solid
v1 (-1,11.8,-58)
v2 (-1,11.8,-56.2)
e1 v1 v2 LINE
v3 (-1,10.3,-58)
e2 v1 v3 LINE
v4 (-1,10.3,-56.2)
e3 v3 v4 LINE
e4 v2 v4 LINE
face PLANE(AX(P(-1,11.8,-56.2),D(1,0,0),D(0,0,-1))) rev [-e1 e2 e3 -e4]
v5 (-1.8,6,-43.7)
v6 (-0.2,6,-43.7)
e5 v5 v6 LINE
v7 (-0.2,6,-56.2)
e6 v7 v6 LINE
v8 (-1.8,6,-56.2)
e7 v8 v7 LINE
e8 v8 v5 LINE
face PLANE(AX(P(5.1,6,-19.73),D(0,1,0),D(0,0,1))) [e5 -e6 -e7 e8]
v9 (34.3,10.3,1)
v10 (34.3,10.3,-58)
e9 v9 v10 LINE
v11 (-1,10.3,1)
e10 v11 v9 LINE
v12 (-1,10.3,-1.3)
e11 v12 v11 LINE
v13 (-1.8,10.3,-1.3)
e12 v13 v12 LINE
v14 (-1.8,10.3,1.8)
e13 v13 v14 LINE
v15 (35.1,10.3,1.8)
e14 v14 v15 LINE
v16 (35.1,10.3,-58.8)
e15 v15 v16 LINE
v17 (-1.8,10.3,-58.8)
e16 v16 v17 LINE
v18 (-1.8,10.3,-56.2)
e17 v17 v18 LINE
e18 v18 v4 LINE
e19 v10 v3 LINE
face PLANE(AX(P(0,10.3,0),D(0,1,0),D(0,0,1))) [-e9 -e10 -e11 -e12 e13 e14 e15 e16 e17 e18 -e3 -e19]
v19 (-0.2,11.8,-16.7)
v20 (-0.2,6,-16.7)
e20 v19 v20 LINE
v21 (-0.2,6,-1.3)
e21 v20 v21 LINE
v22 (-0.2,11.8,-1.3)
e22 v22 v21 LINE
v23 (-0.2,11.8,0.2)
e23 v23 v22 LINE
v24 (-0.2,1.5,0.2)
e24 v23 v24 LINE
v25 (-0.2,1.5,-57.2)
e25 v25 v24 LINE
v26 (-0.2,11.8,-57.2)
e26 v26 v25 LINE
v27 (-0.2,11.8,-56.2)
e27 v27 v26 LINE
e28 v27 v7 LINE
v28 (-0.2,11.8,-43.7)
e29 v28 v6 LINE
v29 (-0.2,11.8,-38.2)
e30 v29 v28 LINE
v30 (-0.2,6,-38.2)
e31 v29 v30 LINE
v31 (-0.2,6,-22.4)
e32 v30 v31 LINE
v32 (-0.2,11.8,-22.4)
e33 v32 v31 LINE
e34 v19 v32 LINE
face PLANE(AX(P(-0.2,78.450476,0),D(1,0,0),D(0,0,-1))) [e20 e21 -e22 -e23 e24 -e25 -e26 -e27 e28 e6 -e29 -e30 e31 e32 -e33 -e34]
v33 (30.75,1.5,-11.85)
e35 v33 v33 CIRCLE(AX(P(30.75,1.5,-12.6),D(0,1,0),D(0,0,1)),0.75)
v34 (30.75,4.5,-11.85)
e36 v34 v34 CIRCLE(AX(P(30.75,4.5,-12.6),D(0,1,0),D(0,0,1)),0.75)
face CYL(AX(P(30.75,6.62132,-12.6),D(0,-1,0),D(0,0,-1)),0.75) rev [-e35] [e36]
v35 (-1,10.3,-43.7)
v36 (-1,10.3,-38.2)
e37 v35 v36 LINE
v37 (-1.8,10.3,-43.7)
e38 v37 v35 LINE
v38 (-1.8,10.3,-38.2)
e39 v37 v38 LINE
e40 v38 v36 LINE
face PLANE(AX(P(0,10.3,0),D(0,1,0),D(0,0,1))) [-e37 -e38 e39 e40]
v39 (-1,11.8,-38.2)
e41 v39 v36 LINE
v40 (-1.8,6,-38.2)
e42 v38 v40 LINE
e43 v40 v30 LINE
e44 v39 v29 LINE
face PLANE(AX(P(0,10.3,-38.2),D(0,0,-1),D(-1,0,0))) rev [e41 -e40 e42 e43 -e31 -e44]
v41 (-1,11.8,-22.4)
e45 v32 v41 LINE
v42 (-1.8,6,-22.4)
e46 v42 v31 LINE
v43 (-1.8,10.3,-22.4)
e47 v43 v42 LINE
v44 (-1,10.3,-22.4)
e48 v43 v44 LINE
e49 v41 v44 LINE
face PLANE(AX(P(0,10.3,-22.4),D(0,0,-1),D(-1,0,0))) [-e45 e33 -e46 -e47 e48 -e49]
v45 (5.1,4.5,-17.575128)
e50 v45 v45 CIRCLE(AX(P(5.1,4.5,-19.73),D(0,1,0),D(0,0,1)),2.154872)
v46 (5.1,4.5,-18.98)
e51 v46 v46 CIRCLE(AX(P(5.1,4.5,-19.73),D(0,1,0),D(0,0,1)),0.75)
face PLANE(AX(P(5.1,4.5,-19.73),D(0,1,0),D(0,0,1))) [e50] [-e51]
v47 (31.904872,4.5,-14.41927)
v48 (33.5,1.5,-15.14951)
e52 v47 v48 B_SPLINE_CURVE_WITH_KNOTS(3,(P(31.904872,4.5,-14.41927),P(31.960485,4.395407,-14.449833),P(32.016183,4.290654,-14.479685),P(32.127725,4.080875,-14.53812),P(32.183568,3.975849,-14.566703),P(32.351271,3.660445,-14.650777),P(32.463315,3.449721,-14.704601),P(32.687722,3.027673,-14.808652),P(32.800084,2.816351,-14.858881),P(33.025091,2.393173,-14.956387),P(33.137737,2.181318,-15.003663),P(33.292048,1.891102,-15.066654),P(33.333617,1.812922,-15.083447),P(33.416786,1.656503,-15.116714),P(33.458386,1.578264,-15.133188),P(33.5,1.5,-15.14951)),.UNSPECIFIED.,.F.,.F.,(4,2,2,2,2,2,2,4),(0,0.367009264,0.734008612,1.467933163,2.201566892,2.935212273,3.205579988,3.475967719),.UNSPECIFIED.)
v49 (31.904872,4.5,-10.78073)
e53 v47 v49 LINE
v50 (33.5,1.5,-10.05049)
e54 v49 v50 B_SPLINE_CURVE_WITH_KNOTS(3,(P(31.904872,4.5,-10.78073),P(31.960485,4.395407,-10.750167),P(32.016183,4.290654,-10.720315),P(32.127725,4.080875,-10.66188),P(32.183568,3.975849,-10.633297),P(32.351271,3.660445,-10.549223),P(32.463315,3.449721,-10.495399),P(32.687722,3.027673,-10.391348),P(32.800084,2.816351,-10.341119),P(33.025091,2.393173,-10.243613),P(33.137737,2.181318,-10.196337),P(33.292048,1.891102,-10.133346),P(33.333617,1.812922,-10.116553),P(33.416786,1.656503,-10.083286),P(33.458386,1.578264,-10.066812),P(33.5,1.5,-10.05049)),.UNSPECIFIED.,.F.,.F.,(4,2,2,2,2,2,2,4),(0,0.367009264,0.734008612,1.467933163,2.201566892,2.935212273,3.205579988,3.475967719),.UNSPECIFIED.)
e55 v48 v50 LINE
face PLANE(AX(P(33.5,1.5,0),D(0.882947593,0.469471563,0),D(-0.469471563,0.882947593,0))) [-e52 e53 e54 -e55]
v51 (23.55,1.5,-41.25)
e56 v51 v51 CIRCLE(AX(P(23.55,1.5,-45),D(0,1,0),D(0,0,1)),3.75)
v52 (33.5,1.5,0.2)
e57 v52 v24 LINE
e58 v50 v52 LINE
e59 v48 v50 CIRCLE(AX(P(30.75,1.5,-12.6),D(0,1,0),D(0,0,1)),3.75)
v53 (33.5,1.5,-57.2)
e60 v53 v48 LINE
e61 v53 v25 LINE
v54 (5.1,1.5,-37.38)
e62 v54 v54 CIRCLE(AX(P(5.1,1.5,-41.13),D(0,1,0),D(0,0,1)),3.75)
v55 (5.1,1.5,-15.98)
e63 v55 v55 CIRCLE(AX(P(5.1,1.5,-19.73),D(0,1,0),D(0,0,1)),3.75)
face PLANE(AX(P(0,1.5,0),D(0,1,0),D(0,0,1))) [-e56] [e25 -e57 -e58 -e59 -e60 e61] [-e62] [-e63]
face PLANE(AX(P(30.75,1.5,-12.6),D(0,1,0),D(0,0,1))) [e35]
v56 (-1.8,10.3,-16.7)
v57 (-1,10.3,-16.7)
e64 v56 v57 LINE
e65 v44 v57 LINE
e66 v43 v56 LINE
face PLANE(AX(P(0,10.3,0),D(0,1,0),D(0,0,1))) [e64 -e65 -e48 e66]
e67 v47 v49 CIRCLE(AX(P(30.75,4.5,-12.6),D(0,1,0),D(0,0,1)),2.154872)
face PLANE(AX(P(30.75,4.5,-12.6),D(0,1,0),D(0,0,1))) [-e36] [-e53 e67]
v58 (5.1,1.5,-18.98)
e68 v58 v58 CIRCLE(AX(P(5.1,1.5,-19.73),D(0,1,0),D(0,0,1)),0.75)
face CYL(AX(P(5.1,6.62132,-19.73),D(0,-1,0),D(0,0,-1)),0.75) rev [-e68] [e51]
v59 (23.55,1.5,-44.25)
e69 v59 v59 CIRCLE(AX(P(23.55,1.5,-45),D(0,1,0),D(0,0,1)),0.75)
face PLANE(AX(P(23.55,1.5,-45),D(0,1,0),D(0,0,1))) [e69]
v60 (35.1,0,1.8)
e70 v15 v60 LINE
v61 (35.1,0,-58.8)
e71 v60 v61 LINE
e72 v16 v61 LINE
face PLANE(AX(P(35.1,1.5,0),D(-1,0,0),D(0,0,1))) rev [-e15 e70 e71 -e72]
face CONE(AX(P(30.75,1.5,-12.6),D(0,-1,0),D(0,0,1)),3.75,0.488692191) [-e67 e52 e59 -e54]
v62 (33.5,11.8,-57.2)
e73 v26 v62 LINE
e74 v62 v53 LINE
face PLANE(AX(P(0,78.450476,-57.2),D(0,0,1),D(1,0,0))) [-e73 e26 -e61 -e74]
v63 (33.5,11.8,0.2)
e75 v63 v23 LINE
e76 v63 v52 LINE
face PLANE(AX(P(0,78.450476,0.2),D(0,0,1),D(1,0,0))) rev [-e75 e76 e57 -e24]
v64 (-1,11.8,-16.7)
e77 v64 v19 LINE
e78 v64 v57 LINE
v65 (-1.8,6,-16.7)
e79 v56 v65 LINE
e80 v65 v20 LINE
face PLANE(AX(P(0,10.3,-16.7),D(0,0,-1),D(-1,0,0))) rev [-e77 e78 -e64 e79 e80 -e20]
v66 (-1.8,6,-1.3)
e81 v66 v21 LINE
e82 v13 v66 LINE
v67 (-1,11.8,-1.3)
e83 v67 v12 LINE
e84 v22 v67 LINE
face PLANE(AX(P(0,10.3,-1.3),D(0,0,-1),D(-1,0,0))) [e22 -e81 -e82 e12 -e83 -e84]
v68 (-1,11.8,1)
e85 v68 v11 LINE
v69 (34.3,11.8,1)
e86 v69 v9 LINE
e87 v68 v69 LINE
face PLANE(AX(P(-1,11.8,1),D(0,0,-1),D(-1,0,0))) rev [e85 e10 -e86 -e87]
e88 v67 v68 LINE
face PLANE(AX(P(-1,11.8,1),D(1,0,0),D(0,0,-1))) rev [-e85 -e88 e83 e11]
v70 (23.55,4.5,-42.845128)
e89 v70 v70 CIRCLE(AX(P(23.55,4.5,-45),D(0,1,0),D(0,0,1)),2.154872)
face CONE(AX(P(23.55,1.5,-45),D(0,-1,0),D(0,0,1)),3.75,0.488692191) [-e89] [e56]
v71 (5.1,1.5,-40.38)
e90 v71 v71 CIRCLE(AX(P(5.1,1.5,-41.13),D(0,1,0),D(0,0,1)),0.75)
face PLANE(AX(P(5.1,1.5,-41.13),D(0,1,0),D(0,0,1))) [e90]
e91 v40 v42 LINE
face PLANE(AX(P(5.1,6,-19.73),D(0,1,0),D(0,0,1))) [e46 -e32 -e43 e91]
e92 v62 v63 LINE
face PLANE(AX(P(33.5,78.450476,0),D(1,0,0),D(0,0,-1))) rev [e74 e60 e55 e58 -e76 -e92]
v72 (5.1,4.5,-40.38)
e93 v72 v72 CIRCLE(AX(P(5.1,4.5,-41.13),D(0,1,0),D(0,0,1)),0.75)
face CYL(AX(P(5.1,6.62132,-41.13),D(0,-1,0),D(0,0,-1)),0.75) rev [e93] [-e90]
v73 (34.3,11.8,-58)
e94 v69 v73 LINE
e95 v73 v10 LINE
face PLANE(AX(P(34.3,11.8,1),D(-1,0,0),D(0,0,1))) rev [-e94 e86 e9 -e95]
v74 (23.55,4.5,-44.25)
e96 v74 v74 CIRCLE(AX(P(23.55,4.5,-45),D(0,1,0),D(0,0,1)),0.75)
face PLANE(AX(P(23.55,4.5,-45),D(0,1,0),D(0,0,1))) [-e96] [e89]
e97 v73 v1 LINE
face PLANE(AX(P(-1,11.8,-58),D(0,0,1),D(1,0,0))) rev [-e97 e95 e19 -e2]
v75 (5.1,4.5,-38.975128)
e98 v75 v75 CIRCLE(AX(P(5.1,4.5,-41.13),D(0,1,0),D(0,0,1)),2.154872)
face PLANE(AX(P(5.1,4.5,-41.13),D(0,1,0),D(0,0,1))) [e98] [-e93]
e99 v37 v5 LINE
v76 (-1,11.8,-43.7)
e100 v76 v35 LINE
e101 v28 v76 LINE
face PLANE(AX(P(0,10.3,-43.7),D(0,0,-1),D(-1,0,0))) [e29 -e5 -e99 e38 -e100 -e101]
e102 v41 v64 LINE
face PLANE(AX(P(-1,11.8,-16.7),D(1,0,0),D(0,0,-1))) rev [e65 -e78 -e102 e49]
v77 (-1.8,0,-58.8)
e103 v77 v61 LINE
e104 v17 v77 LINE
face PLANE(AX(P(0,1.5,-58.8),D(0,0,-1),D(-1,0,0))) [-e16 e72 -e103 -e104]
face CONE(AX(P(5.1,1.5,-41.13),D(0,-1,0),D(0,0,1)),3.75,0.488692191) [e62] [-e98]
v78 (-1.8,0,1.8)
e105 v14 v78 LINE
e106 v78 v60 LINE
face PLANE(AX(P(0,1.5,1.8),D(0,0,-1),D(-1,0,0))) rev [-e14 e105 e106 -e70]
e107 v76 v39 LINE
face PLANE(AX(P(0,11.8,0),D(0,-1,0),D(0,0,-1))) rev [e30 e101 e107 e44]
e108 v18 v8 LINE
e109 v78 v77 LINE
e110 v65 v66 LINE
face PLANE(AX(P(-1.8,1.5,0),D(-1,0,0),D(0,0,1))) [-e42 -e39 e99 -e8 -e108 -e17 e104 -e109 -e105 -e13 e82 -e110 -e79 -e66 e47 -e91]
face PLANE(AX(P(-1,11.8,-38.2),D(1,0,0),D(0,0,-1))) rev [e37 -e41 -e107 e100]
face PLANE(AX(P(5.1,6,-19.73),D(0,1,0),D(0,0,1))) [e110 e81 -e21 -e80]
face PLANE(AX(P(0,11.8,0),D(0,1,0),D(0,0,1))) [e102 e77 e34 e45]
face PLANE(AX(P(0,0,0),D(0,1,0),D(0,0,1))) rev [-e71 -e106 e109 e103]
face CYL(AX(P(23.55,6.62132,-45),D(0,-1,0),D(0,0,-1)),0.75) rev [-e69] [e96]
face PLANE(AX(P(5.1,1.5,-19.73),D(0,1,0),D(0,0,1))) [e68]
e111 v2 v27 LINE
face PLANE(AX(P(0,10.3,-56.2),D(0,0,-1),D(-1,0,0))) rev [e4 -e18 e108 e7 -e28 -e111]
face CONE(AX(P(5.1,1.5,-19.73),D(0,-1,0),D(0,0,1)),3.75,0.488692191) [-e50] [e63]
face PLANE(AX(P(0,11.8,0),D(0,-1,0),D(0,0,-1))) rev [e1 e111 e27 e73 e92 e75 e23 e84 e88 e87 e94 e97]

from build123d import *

# Parameters (mm, degrees)
SKETCH_2_W            = 36.9
SKETCH_2_H            = 60.6
SKETCH_2_W_2          = 33.7
SKETCH_2_H_2          = 57.4
SKETCH_2_R            = 3.75
SKETCH_2_R_2          = 2.25
SKETCH_2_R_3          = 0.75
EXTRUDE_1_DEPTH       = 1.5
EXTRUDE_2_OUTLINE_R   = 2.154871705
EXTRUDE_2_DEPTH       = 3
EXTRUDE_2_DRAFT       = 28
EXTRUDE_2_2_OUTLINE_R = 2.154871705
EXTRUDE_2_2_DEPTH     = 3
EXTRUDE_2_2_DRAFT     = 28
EXTRUDE_2_3_DEPTH     = 3
EXTRUDE_2_3_DRAFT     = 28
EXTRUDE_2_4_OUTLINE_R = 2.154871705
EXTRUDE_2_4_DEPTH     = 3
EXTRUDE_2_4_DRAFT     = 28
EXTRUDE_START         = 1.5
SKETCH_2_11_W         = 36.9
SKETCH_2_11_H         = 60.6
SKETCH_2_11_W_2       = 33.7
SKETCH_2_11_H_2       = 57.4
EXTRUDE_3_DEPTH       = 4.5
SKETCH_3_W            = 1.6
SKETCH_3_H            = 5.7
SKETCH_3_H_2          = 5.5
EXTRUDE_4_DEPTH       = 4.3
SKETCH_5_W            = 0.8
SKETCH_5_H            = 5.5
SKETCH_5_H_2          = 5.7
EXTRUDE_5_DEPTH       = 1.5
CUT_EXTRUDE_START     = 1.5
SKETCH_2_12_R         = 0.75
CUT_EXTRUDE_1_DEPTH   = 3


# Read off the part's stored shape, not the designer's step: Бобышка-Вытянуть2
with BuildPart() as part:
    # Эскиз2 → Бобышка-Вытянуть1 (new body)
    # profile 1 of 14: a face of its own
    with BuildSketch(Plane(origin=(0, 0, 0), x_dir=(1, 0, 0), z_dir=(0, 1, 0))):
        with Locations((16.65, 28.5)):
            Rectangle(SKETCH_2_W, SKETCH_2_H)
        with Locations((16.65, 28.5)):
            Rectangle(SKETCH_2_W_2, SKETCH_2_H_2, mode=Mode.SUBTRACT)
    # profile 2 of 14: a face of its own
    with BuildSketch(Plane(origin=(0, 0, 0), x_dir=(1, 0, 0), z_dir=(0, 1, 0))):
        with BuildLine():
            Line((-0.2, 57.2), (-0.2, -0.2))
            Line((-0.2, -0.2), (33.5, -0.2))
            Line((33.5, -0.2), (33.5, 10.050490243))
            ThreePointArc((33.5, 10.050490243), (27, 12.6), (33.5, 15.149509757))
            Line((33.5, 15.149509757), (33.5, 57.2))
            Line((33.5, 57.2), (-0.2, 57.2))
        make_face()
        with Locations((5.1, 19.73)):
            Circle(SKETCH_2_R, mode=Mode.SUBTRACT)
        with Locations((5.1, 41.13)):
            Circle(SKETCH_2_R, mode=Mode.SUBTRACT)
        with Locations((23.55, 45)):
            Circle(SKETCH_2_R, mode=Mode.SUBTRACT)
    # profile 3 of 14: a face of its own
    with BuildSketch(Plane(origin=(0, 0, 0), x_dir=(1, 0, 0), z_dir=(0, 1, 0))):
        with Locations((23.55, 45)):
            Circle(SKETCH_2_R)
        with Locations((23.55, 45)):
            Circle(SKETCH_2_R_2, mode=Mode.SUBTRACT)
    # profile 4 of 14: a face of its own
    with BuildSketch(Plane(origin=(0, 0, 0), x_dir=(1, 0, 0), z_dir=(0, 1, 0))):
        with Locations((23.55, 45)):
            Circle(SKETCH_2_R_2)
        with Locations((23.55, 45)):
            Circle(SKETCH_2_R_3, mode=Mode.SUBTRACT)
    # profile 5 of 14: a face of its own
    with BuildSketch(Plane(origin=(0, 0, 0), x_dir=(1, 0, 0), z_dir=(0, 1, 0))):
        with Locations((23.55, 45)):
            Circle(SKETCH_2_R_3)
    # profile 6 of 14: a face of its own
    with BuildSketch(Plane(origin=(0, 0, 0), x_dir=(1, 0, 0), z_dir=(0, 1, 0))):
        with Locations((5.1, 41.13)):
            Circle(SKETCH_2_R)
        with Locations((5.1, 41.13)):
            Circle(SKETCH_2_R_2, mode=Mode.SUBTRACT)
    # profile 7 of 14: a face of its own
    with BuildSketch(Plane(origin=(0, 0, 0), x_dir=(1, 0, 0), z_dir=(0, 1, 0))):
        with Locations((5.1, 41.13)):
            Circle(SKETCH_2_R_2)
        with Locations((5.1, 41.13)):
            Circle(SKETCH_2_R_3, mode=Mode.SUBTRACT)
    # profile 8 of 14: a face of its own
    with BuildSketch(Plane(origin=(0, 0, 0), x_dir=(1, 0, 0), z_dir=(0, 1, 0))):
        with Locations((5.1, 41.13)):
            Circle(SKETCH_2_R_3)
    # profile 9 of 14: a face of its own
    with BuildSketch(Plane(origin=(0, 0, 0), x_dir=(1, 0, 0), z_dir=(0, 1, 0))):
        with Locations((5.1, 19.73)):
            Circle(SKETCH_2_R)
        with Locations((5.1, 19.73)):
            Circle(SKETCH_2_R_2, mode=Mode.SUBTRACT)
    # profile 10 of 14: a face of its own
    with BuildSketch(Plane(origin=(0, 0, 0), x_dir=(1, 0, 0), z_dir=(0, 1, 0))):
        with Locations((5.1, 19.73)):
            Circle(SKETCH_2_R_2)
        with Locations((5.1, 19.73)):
            Circle(SKETCH_2_R_3, mode=Mode.SUBTRACT)
    # profile 11 of 14: a face of its own
    with BuildSketch(Plane(origin=(0, 0, 0), x_dir=(1, 0, 0), z_dir=(0, 1, 0))):
        with Locations((5.1, 19.73)):
            Circle(SKETCH_2_R_3)
    # profile 12 of 14: a face of its own
    with BuildSketch(Plane(origin=(0, 0, 0), x_dir=(1, 0, 0), z_dir=(0, 1, 0))):
        with BuildLine():
            ThreePointArc((33.5, 15.149509757), (27, 12.6), (33.5, 10.050490243))
            Line((33.5, 10.050490243), (33.5, 15.149509757))
        make_face()
        with Locations((30.75, 12.6)):
            Circle(SKETCH_2_R_2, mode=Mode.SUBTRACT)
    # profile 13 of 14: a face of its own
    with BuildSketch(Plane(origin=(0, 0, 0), x_dir=(1, 0, 0), z_dir=(0, 1, 0))):
        with Locations((30.75, 12.6)):
            Circle(SKETCH_2_R_2)
        with Locations((30.75, 12.6)):
            Circle(SKETCH_2_R_3, mode=Mode.SUBTRACT)
    # profile 14 of 14: a face of its own
    with BuildSketch(Plane(origin=(0, 0, 0), x_dir=(1, 0, 0), z_dir=(0, 1, 0))):
        with Locations((30.75, 12.6)):
            Circle(SKETCH_2_R_3)
    extrude(amount=EXTRUDE_1_DEPTH)


with BuildPart() as extrude_2_tool:
    # Бобышка-Вытянуть2 outline → Бобышка-Вытянуть2 (with draft: the straight prism first)
    with BuildSketch(Plane(origin=(0, 4.5, 0), x_dir=(1, 0, 0), z_dir=(0, 1, 0))):
        with Locations((5.1, 41.13)):
            Circle(EXTRUDE_2_OUTLINE_R)
    extrude(amount=-EXTRUDE_2_DEPTH)
    # Бобышка-Вытянуть2: the draft: its side faces are tilted about the plane it starts from
    extrude_2_sides = [extrude_2_tool.faces().sort_by_distance(p)[0] for p in [
        (2.945128295, 3, -41.13),
    ]]
    draft(extrude_2_sides, Plane(origin=(0, 4.5, 0), x_dir=(1, 0, 0), z_dir=(0, 1, 0)), EXTRUDE_2_DRAFT)


with BuildPart() as part_1:
    add(part.part)

    # Бобышка-Вытянуть2: add extrude_2_tool
    add(extrude_2_tool.part)


with BuildPart() as extrude_2_2_tool:
    # Extrude 2 2 outline → Extrude 2 2 (with draft: the straight prism first)
    with BuildSketch(Plane(origin=(0, 4.5, 0), x_dir=(1, 0, 0), z_dir=(0, 1, 0))):
        with Locations((23.55, 45)):
            Circle(EXTRUDE_2_2_OUTLINE_R)
    extrude(amount=-EXTRUDE_2_2_DEPTH)
    # Extrude 2 2: the draft: its side faces are tilted about the plane it starts from
    extrude_2_2_sides = [extrude_2_2_tool.faces().sort_by_distance(p)[0] for p in [
        (21.395128295, 3, -45),
    ]]
    draft(extrude_2_2_sides, Plane(origin=(0, 4.5, 0), x_dir=(1, 0, 0), z_dir=(0, 1, 0)), EXTRUDE_2_2_DRAFT)


with BuildPart() as part_2:
    add(part_1.part)

    # Extrude 2 2: add extrude_2_2_tool
    add(extrude_2_2_tool.part)


with BuildPart() as extrude_2_3_tool:
    # Extrude 2 3 outline → Extrude 2 3 (with draft: the straight prism first)
    with BuildSketch(Plane(origin=(0, 4.5, 0), x_dir=(1, 0, 0), z_dir=(0, 1, 0))):
        with BuildLine():
            ThreePointArc((31.904871705, 14.419270021), (28.595128295, 12.6), (31.904871705, 10.780729979))
            Line((31.904871705, 10.780729979), (31.904871705, 14.419270021))
        make_face()
    extrude(amount=-EXTRUDE_2_3_DEPTH)
    # Extrude 2 3: the draft: its side faces are tilted about the plane it starts from
    extrude_2_3_sides = [extrude_2_3_tool.faces().sort_by_distance(p)[0] for p in [
        (28.595128295, 3, -12.6),
        (31.904871705, 3, -12.6),
    ]]
    draft(extrude_2_3_sides, Plane(origin=(0, 4.5, 0), x_dir=(1, 0, 0), z_dir=(0, 1, 0)), EXTRUDE_2_3_DRAFT)


with BuildPart() as part_3:
    add(part_2.part)

    # Extrude 2 3: add extrude_2_3_tool
    add(extrude_2_3_tool.part)


with BuildPart() as extrude_2_4_tool:
    # Extrude 2 4 outline → Extrude 2 4 (with draft: the straight prism first)
    with BuildSketch(Plane(origin=(0, 4.5, 0), x_dir=(1, 0, 0), z_dir=(0, 1, 0))):
        with Locations((5.1, 19.73)):
            Circle(EXTRUDE_2_4_OUTLINE_R)
    extrude(amount=-EXTRUDE_2_4_DEPTH)
    # Extrude 2 4: the draft: its side faces are tilted about the plane it starts from
    extrude_2_4_sides = [extrude_2_4_tool.faces().sort_by_distance(p)[0] for p in [
        (2.945128295, 3, -19.73),
    ]]
    draft(extrude_2_4_sides, Plane(origin=(0, 4.5, 0), x_dir=(1, 0, 0), z_dir=(0, 1, 0)), EXTRUDE_2_4_DRAFT)


with BuildPart() as part_4:
    add(part_3.part)

    # Extrude 2 4: add extrude_2_4_tool
    add(extrude_2_4_tool.part)

    # Эскиз2<11> → Бобышка-Вытянуть3 (add)
    with BuildSketch(Plane(origin=(0, 0, 0), x_dir=(1, 0, 0), z_dir=(0, 1, 0)).offset(EXTRUDE_START)):
        with Locations((16.65, 28.5)):
            Rectangle(SKETCH_2_11_W, SKETCH_2_11_H)
        with Locations((16.65, 28.5)):
            Rectangle(SKETCH_2_11_W_2, SKETCH_2_11_H_2, mode=Mode.SUBTRACT)
    extrude(amount=EXTRUDE_3_DEPTH)

    # Эскиз3 → Бобышка-Вытянуть4 (add)
    with BuildSketch(Plane(origin=(0, 6, 0), x_dir=(1, 0, 0), z_dir=(0, 1, 0))):
        Polygon((-0.2, 1.3), (-1.8, 1.3), (-1.8, -1.8), (35.1, -1.8), (35.1, 58.8), (-1.8, 58.8), (-1.8, 56.2), (-0.2, 56.2), (-0.2, 57.2), (33.5, 57.2), (33.5, -0.2), (-0.2, -0.2), align=None)
        with Locations((-1, 19.55)):
            Rectangle(SKETCH_3_W, SKETCH_3_H)
        with Locations((-1, 40.95)):
            Rectangle(SKETCH_3_W, SKETCH_3_H_2)
    extrude(amount=EXTRUDE_4_DEPTH)

    # Эскиз5 → Бобышка-Вытянуть5 (add)
    with BuildSketch(Plane(origin=(0, 10.3, 0), x_dir=(1, 0, 0), z_dir=(0, 1, 0))):
        Polygon((-1, -1), (34.3, -1), (34.3, 58), (-1, 58), (-1, 56.2), (-0.2, 56.2), (-0.2, 57.2), (33.5, 57.2), (33.5, -0.2), (-0.2, -0.2), (-0.2, 1.3), (-1, 1.3), align=None)
        with Locations((-0.6, 40.95)):
            Rectangle(SKETCH_5_W, SKETCH_5_H)
        with Locations((-0.6, 19.55)):
            Rectangle(SKETCH_5_W, SKETCH_5_H_2)
    extrude(amount=EXTRUDE_5_DEPTH)

    # Эскиз2<12> → Вырез-Вытянуть1 (cut)
    with BuildSketch(Plane(origin=(0, 0, 0), x_dir=(1, 0, 0), z_dir=(0, 1, 0)).offset(CUT_EXTRUDE_START)):
        with Locations(Location((23.55, 45, 0), (0, 0, 270))):
            Circle(SKETCH_2_12_R)
        with Locations(Location((5.1, 41.13, 0), (0, 0, 270))):
            Circle(SKETCH_2_12_R)
        with Locations(Location((5.1, 19.73, 0), (0, 0, 270))):
            Circle(SKETCH_2_12_R)
        with Locations(Location((30.75, 12.6, 0), (0, 0, 270))):
            Circle(SKETCH_2_12_R)
    extrude(amount=CUT_EXTRUDE_1_DEPTH, mode=Mode.SUBTRACT)


solid = part_4.part
